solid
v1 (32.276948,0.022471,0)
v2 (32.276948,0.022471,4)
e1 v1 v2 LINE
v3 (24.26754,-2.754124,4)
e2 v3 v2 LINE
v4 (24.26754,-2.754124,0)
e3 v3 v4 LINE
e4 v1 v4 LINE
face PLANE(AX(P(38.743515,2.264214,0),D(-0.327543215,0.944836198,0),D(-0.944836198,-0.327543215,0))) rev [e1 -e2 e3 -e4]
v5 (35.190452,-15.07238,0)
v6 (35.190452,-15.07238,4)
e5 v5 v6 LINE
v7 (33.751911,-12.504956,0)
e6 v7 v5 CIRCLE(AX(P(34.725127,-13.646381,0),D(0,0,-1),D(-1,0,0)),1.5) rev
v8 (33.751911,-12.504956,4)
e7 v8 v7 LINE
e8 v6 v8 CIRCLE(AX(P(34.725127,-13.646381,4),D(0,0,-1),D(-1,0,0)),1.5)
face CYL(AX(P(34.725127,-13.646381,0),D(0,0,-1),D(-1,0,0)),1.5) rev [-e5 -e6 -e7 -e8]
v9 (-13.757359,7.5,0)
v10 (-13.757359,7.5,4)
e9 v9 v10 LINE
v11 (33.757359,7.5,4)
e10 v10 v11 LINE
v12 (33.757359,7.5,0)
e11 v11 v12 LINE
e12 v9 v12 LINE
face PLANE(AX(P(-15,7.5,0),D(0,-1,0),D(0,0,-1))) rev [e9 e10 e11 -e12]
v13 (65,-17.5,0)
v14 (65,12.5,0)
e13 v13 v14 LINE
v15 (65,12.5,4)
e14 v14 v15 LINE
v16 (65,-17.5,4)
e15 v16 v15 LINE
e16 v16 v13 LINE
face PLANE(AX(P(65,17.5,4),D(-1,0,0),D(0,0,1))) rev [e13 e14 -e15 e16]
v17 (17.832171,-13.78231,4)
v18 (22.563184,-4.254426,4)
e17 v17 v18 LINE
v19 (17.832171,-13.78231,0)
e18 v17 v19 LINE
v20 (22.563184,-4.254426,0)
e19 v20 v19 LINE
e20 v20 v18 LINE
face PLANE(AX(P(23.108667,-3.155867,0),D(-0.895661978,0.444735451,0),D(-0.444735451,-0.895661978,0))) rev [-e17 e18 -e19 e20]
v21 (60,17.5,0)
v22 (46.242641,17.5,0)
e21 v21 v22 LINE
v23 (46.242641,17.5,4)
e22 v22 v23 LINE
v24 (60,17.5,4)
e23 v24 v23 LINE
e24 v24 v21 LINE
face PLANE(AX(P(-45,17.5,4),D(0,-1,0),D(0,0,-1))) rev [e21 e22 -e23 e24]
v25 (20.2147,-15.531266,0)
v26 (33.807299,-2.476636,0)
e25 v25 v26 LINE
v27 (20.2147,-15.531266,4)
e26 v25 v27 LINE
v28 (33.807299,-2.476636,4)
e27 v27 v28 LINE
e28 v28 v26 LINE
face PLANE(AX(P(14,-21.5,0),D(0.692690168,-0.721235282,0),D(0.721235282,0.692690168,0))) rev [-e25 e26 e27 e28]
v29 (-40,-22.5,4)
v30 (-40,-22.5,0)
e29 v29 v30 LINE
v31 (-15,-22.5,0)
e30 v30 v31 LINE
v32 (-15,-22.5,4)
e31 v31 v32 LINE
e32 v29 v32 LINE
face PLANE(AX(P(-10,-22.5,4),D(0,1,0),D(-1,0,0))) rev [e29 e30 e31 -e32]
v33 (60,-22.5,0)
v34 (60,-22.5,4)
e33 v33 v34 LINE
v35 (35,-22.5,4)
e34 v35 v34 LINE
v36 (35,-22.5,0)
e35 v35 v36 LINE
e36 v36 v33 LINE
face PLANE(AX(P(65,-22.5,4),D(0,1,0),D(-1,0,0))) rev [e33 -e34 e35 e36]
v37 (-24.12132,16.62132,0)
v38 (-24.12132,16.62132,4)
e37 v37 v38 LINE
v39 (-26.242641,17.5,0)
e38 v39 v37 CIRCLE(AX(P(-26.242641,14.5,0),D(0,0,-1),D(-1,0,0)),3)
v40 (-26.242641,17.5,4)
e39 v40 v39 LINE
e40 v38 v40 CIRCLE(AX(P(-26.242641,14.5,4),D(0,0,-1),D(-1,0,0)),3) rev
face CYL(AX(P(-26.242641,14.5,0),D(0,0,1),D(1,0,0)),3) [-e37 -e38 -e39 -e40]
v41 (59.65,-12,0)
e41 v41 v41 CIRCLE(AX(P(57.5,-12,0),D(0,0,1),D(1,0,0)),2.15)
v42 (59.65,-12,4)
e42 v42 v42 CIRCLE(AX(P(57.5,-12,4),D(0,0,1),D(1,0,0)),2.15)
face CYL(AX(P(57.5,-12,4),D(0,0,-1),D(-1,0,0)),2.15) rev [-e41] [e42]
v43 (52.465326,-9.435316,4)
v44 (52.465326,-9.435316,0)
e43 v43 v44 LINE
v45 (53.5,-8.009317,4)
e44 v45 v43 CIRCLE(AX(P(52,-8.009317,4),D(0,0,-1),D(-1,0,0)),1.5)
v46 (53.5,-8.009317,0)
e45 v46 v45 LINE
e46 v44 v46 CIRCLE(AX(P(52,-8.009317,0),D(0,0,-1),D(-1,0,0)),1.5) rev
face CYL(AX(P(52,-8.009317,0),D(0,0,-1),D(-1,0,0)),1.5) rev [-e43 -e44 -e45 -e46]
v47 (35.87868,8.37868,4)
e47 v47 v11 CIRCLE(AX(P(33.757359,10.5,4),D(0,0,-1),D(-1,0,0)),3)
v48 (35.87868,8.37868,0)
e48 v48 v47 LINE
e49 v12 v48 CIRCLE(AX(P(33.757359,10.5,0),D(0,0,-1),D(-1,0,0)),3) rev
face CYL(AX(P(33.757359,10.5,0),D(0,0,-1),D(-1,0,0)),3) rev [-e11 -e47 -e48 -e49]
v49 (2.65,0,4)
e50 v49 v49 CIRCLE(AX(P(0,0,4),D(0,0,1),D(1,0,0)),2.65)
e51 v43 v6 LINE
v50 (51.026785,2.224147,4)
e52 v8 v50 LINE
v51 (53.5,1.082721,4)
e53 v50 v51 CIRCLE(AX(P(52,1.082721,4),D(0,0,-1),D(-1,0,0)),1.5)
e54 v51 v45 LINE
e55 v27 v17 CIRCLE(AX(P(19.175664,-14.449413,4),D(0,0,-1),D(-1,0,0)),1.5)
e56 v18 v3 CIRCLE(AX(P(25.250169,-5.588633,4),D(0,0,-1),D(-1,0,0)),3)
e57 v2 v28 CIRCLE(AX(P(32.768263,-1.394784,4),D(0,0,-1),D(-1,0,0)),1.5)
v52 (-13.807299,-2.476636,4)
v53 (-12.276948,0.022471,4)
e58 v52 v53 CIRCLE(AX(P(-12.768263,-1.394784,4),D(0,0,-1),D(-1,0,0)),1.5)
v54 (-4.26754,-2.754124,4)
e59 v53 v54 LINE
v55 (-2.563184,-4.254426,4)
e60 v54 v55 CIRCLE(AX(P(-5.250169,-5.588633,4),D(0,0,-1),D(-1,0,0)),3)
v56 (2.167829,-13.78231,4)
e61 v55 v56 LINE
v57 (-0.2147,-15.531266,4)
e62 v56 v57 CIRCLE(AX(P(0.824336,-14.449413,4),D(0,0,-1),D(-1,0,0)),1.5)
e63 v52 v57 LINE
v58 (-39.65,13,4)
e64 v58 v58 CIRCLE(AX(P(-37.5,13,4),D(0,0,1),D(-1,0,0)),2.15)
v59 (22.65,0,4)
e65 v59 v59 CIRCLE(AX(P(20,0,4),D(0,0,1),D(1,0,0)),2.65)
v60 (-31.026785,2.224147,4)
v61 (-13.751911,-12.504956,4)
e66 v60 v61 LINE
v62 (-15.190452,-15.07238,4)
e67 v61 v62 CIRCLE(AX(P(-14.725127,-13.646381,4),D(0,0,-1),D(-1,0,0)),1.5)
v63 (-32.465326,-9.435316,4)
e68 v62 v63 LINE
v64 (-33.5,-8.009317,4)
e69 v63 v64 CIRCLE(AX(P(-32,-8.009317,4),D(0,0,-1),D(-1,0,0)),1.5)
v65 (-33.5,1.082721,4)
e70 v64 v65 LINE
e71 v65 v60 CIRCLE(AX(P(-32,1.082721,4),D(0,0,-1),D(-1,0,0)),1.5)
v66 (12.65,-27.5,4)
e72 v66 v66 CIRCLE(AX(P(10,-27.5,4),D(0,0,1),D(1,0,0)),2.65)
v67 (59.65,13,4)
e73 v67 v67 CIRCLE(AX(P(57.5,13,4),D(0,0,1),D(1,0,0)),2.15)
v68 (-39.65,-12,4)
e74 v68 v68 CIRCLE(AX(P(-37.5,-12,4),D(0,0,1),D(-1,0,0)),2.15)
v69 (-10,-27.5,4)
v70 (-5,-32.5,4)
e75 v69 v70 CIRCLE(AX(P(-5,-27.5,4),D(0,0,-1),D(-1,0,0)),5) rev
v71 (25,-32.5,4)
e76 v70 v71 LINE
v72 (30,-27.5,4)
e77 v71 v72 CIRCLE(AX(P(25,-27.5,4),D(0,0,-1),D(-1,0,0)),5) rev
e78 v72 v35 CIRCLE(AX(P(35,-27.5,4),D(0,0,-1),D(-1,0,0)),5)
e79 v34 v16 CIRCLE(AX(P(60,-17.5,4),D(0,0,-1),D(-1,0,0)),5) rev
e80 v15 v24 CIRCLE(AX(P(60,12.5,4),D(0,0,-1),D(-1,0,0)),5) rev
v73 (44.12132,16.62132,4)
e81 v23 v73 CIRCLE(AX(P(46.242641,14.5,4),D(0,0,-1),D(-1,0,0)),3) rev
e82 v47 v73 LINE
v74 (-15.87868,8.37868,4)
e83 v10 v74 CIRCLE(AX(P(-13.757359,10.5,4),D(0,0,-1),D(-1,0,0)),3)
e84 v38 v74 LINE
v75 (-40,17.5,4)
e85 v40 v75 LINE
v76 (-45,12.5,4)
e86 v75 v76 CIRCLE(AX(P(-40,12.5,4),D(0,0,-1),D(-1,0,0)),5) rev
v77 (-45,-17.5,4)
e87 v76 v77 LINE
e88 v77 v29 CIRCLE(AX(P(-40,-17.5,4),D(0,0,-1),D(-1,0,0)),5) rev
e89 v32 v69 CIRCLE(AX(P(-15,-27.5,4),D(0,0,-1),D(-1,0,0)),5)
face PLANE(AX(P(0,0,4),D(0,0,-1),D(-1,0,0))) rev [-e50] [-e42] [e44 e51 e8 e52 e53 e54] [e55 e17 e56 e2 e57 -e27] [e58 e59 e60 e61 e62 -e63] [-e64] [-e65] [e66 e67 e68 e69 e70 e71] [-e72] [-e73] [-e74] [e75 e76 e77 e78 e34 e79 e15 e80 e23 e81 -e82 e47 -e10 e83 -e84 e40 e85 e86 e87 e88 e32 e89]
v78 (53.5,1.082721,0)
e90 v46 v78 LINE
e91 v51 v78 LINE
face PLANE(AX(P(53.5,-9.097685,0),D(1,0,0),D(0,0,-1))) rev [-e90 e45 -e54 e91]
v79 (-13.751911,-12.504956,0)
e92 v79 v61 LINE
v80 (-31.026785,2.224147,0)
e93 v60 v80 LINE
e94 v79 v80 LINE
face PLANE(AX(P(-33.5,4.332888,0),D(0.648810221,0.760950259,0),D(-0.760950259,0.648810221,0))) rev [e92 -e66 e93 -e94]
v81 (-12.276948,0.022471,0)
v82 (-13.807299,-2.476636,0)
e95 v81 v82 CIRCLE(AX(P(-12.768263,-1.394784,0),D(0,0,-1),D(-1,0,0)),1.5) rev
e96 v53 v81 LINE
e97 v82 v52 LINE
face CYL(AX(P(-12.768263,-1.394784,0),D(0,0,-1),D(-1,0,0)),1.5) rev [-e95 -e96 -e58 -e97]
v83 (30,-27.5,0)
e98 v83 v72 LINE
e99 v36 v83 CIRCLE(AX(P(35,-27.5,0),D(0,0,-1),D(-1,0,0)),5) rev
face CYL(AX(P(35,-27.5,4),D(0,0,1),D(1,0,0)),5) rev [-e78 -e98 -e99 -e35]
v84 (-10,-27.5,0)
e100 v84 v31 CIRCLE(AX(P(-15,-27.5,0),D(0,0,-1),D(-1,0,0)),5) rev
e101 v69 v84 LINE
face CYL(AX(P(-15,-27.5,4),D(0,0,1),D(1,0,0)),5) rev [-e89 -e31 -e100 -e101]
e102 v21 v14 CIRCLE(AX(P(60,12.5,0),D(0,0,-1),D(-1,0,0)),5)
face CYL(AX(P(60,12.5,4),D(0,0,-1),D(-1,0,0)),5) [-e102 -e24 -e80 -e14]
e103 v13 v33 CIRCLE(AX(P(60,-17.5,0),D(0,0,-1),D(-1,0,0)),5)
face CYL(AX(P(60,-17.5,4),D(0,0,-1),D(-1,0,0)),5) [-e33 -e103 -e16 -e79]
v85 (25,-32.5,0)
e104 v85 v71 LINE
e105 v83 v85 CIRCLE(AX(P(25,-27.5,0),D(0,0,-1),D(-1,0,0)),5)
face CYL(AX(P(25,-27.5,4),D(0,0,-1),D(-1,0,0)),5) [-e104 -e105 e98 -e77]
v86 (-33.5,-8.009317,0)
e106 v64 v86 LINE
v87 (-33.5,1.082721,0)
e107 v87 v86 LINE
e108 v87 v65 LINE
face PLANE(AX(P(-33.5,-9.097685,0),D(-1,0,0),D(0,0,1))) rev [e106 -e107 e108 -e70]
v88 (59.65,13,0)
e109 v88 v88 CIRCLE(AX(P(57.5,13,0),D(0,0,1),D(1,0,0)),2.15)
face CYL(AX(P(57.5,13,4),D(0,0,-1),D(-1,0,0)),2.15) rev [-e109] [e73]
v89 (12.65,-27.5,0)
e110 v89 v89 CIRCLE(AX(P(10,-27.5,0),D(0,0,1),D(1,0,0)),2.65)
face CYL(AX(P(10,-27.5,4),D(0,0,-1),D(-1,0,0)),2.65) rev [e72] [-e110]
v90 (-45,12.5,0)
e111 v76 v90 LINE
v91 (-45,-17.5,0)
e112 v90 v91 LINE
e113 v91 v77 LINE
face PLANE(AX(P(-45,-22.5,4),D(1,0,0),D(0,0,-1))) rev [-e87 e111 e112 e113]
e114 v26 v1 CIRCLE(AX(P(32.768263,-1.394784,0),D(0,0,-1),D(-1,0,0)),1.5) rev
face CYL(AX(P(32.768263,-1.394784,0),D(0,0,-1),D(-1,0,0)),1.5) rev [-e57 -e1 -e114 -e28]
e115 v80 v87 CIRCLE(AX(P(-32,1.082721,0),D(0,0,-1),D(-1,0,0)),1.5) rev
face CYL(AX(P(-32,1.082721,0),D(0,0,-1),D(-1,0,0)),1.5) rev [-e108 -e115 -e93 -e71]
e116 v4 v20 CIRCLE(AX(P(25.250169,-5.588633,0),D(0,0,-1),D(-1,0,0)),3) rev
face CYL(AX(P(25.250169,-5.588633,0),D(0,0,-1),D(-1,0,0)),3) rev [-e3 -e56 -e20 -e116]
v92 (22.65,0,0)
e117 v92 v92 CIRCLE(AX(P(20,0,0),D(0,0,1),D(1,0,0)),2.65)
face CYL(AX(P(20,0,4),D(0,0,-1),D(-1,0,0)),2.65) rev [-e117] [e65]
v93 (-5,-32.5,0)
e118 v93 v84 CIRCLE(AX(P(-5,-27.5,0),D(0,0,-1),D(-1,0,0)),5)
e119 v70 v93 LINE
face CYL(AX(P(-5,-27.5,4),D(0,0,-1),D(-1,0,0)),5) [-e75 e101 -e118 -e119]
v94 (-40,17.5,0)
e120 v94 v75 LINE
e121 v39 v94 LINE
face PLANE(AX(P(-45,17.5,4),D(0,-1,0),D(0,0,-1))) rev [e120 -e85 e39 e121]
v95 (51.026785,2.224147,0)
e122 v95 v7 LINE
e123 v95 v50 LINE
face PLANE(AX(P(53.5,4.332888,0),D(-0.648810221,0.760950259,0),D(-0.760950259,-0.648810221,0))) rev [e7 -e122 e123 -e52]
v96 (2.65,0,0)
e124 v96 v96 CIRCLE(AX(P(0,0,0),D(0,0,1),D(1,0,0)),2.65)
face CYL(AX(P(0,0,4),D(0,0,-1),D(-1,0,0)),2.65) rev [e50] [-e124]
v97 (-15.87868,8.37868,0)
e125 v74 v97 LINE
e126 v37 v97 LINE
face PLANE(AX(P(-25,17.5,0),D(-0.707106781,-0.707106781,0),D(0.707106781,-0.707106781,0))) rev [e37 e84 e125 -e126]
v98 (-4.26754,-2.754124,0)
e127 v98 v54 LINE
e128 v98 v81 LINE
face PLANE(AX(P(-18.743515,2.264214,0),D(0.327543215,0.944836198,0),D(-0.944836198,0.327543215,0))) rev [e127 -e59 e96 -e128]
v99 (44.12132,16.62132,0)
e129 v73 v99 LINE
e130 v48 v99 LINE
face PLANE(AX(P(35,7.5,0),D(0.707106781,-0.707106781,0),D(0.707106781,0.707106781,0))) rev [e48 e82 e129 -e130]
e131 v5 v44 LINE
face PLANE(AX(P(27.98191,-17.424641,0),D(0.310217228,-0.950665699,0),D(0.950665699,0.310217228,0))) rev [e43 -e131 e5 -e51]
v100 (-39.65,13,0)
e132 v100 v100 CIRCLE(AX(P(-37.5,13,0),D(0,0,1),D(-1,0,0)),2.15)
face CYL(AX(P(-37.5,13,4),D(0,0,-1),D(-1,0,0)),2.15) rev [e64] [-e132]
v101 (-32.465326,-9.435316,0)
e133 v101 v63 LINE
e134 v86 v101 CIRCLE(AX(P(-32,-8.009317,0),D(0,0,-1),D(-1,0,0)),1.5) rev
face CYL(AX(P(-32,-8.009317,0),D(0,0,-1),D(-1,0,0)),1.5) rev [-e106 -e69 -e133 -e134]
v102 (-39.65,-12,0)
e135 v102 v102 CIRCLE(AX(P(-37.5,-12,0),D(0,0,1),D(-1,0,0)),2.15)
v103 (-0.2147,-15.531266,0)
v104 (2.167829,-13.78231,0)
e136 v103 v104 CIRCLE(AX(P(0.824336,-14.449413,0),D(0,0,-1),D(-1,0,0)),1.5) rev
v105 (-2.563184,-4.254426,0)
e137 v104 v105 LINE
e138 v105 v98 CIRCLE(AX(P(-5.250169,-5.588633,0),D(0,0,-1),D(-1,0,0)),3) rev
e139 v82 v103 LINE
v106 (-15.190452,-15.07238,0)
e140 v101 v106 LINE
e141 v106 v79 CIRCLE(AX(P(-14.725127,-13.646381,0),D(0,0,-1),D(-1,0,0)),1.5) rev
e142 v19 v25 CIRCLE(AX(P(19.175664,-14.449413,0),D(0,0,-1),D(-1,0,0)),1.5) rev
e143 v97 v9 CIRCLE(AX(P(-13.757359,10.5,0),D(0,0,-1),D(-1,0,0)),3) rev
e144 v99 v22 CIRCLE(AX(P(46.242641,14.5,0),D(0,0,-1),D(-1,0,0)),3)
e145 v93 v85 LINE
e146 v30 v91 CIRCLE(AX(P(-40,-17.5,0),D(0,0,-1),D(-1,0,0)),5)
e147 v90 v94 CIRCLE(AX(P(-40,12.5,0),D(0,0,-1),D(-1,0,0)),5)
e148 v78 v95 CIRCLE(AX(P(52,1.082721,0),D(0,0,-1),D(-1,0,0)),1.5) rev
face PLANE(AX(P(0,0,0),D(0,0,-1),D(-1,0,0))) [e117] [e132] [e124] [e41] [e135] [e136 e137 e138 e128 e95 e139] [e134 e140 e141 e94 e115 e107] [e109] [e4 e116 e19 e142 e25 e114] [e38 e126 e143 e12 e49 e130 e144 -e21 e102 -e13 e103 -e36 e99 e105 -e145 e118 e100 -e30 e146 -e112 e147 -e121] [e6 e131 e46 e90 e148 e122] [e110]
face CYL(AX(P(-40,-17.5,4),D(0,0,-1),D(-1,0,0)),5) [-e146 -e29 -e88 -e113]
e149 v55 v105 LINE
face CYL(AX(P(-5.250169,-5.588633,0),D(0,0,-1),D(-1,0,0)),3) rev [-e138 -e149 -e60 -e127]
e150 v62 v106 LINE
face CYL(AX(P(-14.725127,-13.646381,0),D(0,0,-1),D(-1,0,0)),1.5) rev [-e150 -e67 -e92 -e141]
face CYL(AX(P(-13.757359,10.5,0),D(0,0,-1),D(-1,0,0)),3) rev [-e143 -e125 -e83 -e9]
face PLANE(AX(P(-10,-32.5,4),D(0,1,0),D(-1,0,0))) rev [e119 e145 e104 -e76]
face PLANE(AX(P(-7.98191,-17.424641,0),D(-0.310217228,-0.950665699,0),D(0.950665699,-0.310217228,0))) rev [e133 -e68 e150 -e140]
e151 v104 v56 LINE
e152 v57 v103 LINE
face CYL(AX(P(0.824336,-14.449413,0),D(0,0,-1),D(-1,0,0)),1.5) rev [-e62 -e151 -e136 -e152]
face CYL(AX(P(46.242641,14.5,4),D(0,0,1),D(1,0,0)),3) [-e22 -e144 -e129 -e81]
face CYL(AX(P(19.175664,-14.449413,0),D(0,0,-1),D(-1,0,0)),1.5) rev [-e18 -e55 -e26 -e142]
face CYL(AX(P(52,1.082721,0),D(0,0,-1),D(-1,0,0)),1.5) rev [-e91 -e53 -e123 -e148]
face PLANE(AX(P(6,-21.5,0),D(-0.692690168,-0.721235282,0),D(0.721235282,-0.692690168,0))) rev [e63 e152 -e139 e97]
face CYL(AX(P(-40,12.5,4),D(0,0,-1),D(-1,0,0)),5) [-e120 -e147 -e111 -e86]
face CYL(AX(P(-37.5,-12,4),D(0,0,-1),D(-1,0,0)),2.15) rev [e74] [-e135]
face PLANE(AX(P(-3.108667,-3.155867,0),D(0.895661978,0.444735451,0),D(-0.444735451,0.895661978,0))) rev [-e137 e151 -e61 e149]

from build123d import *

# Parameters (mm, degrees)
SKETCH_1_R               = 2.65
SKETCH_1_R_2             = 2.15
EXTRUDE_1_DEPTH          = 4
FILLET_1_R               = 5
CUT_EXTRUDE_1_DEPTH      = 73.782209365
FILLET_2_R               = 3
CUT_EXTRUDE_2_DEPTH      = 73.782209365
CUT_EXTRUDE_2_DEPTH_BACK = 73.782209365
FILLET_4_R               = 1.5
FILLET_6_R               = 3


with BuildPart() as part:
    # 草图1 → 凸台-拉伸1 (new body)
    with BuildSketch(Plane.XY):
        Polygon((-45, 17.5), (65, 17.5), (65, -22.5), (30, -22.5), (30, -32.5), (-10, -32.5), (-10, -22.5), (-45, -22.5), align=None)
        with Locations((20, 0)):
            Circle(SKETCH_1_R, mode=Mode.SUBTRACT)
        Circle(SKETCH_1_R, mode=Mode.SUBTRACT)
        with Locations((57.5, 13)):
            Circle(SKETCH_1_R_2, mode=Mode.SUBTRACT)
        with Locations((57.5, -12)):
            Circle(SKETCH_1_R_2, mode=Mode.SUBTRACT)
        with Locations(Location((-37.5, -12, 0), (0, 0, 180))):
            Circle(SKETCH_1_R_2, mode=Mode.SUBTRACT)
        with Locations(Location((-37.5, 13, 0), (0, 0, 180))):
            Circle(SKETCH_1_R_2, mode=Mode.SUBTRACT)
        with Locations((10, -27.5)):
            Circle(SKETCH_1_R, mode=Mode.SUBTRACT)
    extrude(amount=EXTRUDE_1_DEPTH)

    # 圆角1
    fillet_1_edges = [part.edges().sort_by_distance(p)[0] for p in [
        (30, -22.5, 2),
        (-45, 17.5, 2),
        (-45, -22.5, 2),
        (65, 17.5, 2),
        (65, -22.5, 2),
        (30, -32.5, 2),
        (-10, -32.5, 2),
        (-10, -22.5, 2),
    ]]
    fillet(fillet_1_edges, radius=FILLET_1_R - 0.0001)  # a hair under: the kernel refuses the full size

    # 草图3 → 切除-拉伸1 (cut, through all)
    with BuildSketch(Plane.XY.offset(4)):
        Polygon((-25, 17.5), (-15, 7.5), (35, 7.5), (45, 17.5), align=None)
    extrude(amount=-CUT_EXTRUDE_1_DEPTH, mode=Mode.SUBTRACT)

    # 圆角2
    fillet_2_edges = [part.edges().sort_by_distance(p)[0] for p in [
        (-25, 17.5, 2),
        (45, 17.5, 2),
        (35, 7.5, 2),
        (-15, 7.5, 2),
    ]]
    fillet(fillet_2_edges, radius=FILLET_2_R)

    # 草图4 → 切除-拉伸2 (cut, two sides: drawn at the far end of the back side and taken through both)
    with BuildSketch(Plane.XY.offset(4).offset(-CUT_EXTRUDE_2_DEPTH_BACK)):
        Polygon((38.743514733, 2.264213721), (23.108666515, -3.155866994), (14, -21.5), align=None)
        Polygon((27.981910241, -17.424640848), (53.5, -9.097685243), (53.5, 4.332888314), align=None)
        Polygon((-33.5, -9.097685243), (-33.5, 4.332888314), (-7.981910241, -17.424640848), align=None)
        Polygon((-18.743514733, 2.264213721), (-3.108666515, -3.155866994), (6, -21.5), align=None)
    extrude(amount=CUT_EXTRUDE_2_DEPTH + CUT_EXTRUDE_2_DEPTH_BACK, mode=Mode.SUBTRACT)

    # 圆角4
    fillet_4_edges = [part.edges().sort_by_distance(p)[0] for p in [
        (53.5, 4.332888314, 2),
        (53.5, -9.097685243, 2),
        (27.981910241, -17.424640848, 2),
        (-7.981910241, -17.424640848, 2),
        (-33.5, -9.097685243, 2),
        (-33.5, 4.332888314, 2),
        (38.743514733, 2.264213721, 2),
        (14, -21.5, 2),
        (-18.743514733, 2.264213721, 2),
        (6, -21.5, 2),
    ]]
    fillet(fillet_4_edges, radius=FILLET_4_R)

    # 圆角6
    fillet_6_edges = [part.edges().sort_by_distance(p)[0] for p in [
        (-3.108666515, -3.155866994, 2),
        (23.108666515, -3.155866994, 2),
    ]]
    fillet(fillet_6_edges, radius=FILLET_6_R)


solid = part.part
